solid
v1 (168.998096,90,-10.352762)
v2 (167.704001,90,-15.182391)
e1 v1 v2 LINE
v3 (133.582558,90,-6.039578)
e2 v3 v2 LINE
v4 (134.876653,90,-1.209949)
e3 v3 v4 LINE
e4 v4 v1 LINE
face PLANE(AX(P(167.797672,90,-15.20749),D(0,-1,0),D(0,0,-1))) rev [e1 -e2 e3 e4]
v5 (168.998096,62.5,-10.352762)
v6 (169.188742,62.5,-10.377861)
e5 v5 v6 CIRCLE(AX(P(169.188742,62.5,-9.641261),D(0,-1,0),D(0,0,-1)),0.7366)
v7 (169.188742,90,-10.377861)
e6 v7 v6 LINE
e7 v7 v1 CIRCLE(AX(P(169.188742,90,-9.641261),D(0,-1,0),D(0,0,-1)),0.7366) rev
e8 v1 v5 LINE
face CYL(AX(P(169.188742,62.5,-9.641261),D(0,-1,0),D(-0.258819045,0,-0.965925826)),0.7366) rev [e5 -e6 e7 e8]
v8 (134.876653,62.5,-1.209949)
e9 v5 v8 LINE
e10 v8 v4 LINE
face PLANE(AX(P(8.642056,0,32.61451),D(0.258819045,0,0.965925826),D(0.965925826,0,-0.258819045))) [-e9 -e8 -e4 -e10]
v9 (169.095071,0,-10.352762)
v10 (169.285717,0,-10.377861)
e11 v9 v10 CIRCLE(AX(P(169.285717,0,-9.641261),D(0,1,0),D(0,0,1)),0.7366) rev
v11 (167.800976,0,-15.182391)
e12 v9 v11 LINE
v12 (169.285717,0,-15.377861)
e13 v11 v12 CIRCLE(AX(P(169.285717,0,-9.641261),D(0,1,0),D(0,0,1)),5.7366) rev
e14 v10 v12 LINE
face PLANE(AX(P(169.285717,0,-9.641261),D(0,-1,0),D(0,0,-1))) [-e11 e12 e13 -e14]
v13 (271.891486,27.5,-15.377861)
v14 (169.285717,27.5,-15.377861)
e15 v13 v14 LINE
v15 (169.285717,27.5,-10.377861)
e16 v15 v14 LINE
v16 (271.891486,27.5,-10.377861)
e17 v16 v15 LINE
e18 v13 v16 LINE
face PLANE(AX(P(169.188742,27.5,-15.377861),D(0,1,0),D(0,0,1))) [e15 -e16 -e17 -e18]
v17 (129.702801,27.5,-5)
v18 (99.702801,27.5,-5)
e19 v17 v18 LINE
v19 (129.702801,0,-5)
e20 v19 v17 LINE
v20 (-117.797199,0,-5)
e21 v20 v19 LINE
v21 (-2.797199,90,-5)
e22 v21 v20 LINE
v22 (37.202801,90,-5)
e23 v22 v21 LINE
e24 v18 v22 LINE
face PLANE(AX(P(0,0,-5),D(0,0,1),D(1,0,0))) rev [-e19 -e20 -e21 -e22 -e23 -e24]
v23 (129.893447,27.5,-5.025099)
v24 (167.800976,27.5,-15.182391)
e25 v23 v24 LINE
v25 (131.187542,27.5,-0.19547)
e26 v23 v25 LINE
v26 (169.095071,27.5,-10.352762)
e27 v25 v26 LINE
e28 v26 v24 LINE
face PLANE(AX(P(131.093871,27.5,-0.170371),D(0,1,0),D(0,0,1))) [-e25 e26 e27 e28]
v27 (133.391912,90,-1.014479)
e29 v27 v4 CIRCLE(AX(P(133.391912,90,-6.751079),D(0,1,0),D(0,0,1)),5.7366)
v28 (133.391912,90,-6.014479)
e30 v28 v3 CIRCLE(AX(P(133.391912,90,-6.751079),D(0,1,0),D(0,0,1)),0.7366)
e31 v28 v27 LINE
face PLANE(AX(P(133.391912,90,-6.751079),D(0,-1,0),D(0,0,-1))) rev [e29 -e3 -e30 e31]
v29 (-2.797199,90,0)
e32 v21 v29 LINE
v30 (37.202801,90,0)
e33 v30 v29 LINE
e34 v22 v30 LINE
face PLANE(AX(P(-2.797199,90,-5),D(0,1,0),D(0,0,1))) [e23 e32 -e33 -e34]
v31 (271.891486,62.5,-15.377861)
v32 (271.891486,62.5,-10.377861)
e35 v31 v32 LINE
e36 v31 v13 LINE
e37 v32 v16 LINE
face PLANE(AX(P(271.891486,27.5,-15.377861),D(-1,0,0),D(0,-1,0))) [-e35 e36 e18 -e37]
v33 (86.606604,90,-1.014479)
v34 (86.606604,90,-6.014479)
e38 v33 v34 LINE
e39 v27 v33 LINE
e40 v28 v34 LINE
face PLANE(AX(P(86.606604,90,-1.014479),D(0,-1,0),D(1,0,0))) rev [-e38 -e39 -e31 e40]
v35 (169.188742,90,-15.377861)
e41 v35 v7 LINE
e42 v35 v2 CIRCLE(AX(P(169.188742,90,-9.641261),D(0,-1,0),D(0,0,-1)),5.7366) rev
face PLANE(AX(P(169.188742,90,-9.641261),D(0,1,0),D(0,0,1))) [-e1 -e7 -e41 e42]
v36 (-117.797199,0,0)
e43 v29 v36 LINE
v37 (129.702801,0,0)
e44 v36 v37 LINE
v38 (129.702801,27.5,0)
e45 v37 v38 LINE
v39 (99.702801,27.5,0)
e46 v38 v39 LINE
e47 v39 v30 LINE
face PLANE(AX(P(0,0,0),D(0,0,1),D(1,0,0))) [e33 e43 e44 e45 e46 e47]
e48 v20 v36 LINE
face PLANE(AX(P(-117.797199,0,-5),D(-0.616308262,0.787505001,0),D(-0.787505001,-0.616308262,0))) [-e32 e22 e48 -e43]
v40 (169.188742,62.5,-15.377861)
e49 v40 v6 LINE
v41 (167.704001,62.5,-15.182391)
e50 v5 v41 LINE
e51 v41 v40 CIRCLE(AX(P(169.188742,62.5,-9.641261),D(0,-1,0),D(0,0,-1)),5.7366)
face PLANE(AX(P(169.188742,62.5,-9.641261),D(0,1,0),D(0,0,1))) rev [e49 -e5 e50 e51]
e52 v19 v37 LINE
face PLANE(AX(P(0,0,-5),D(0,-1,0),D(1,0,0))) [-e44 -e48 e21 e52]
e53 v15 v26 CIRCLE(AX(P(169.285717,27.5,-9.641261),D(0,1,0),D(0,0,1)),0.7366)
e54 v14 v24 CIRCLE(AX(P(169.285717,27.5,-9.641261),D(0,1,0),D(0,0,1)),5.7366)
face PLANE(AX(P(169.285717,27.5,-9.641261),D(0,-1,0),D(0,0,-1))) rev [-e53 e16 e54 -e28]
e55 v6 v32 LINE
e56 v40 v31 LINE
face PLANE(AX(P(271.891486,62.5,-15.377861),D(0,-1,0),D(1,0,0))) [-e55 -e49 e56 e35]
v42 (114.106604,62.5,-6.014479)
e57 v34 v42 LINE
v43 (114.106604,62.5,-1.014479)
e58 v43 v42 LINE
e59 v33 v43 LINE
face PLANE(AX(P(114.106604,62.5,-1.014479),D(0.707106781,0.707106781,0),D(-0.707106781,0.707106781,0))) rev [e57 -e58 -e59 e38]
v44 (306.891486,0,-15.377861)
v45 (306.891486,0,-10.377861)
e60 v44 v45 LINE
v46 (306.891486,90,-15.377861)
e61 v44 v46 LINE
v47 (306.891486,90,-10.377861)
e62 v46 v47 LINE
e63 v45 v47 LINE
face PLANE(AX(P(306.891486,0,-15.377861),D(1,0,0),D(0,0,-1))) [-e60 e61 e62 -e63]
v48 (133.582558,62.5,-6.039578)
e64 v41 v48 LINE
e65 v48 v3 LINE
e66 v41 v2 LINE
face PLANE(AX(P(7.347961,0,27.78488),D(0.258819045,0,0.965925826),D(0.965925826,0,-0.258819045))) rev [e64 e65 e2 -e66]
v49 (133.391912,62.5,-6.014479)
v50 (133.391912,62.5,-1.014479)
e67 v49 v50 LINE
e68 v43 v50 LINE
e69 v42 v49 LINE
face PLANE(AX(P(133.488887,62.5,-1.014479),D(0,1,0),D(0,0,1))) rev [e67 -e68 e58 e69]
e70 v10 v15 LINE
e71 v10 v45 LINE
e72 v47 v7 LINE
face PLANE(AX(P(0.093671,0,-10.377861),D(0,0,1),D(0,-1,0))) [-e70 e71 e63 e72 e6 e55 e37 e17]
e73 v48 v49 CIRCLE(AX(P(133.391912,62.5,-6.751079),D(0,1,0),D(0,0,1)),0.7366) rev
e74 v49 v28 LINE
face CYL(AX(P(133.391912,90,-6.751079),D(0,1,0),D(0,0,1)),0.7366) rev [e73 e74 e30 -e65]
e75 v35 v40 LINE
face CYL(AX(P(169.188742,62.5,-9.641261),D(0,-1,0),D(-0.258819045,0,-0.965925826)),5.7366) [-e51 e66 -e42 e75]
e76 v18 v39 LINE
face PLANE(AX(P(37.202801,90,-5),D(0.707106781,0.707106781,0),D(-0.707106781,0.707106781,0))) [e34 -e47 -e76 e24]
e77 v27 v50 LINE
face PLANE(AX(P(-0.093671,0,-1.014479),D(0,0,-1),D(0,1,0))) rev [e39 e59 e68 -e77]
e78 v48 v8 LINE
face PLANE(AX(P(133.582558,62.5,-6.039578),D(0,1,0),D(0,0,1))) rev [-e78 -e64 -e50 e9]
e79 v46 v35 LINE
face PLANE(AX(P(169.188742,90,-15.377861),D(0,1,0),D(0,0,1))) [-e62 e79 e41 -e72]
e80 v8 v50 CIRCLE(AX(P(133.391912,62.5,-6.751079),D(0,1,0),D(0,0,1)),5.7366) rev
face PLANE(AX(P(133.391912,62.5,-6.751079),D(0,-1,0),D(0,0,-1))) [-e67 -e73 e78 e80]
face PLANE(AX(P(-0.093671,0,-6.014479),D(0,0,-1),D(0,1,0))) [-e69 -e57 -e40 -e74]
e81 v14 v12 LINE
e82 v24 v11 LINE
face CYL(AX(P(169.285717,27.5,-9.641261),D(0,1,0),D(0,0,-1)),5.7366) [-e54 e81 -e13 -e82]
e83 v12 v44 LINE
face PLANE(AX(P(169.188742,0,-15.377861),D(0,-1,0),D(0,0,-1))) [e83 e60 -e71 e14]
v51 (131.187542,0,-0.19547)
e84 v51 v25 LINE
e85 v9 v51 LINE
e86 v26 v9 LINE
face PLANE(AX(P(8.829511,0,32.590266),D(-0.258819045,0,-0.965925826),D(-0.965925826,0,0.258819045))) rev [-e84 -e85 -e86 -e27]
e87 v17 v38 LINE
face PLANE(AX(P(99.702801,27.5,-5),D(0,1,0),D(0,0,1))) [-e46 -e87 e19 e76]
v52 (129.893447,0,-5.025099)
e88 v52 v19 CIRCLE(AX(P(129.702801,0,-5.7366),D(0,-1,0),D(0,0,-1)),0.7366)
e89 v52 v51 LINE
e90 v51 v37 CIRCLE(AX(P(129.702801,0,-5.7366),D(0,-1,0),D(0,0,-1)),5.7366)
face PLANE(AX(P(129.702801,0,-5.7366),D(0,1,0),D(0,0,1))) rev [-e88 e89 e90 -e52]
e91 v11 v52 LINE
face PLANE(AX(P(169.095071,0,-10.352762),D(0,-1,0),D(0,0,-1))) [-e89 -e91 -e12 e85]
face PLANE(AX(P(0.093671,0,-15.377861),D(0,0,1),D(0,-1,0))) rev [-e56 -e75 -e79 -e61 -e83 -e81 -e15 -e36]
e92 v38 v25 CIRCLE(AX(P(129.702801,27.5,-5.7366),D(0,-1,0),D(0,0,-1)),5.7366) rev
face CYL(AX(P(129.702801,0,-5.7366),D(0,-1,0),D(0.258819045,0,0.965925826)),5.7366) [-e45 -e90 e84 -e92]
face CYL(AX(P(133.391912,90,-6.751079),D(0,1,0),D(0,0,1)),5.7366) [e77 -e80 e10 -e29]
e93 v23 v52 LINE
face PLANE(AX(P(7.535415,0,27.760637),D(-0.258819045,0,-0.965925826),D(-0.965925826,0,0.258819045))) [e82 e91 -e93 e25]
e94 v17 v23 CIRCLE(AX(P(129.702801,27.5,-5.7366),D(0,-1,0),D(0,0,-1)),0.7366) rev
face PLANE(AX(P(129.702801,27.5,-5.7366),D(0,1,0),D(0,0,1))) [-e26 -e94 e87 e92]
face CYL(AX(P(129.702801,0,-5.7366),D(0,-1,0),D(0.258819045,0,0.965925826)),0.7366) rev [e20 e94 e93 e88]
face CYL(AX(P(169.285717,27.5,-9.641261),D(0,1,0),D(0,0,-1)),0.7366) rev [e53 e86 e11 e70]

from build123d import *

# Parameters (mm, degrees)
BASE_FLANGE1_DEPTH       = 5
EDGE_FLANGE1_DEPTH       = 27.5
EDGE_FLANGE2_DEPTH       = 27.5
EDGE_FLANGE2_START       = 62.5
EDGE_FLANGE2_2_OUTLINE_W = 137.70274344
EDGE_FLANGE2_2_OUTLINE_H = 5
EDGE_FLANGE2_2_DEPTH     = 27.5
EDGE_FLANGE2_START_2     = 27.5
EDGE_FLANGE2_3_OUTLINE_W = 35
EDGE_FLANGE2_3_OUTLINE_H = 5
EDGE_FLANGE2_3_DEPTH     = 35
EDGE_FLANGE3_DEPTH       = 27.5
EDGE_FLANGE4_DEPTH       = 27.5
EDGE_FLANGE4_START       = 5
EDGE_FLANGE4_FLAT_DEPTH  = 5


# Read off the part's stored shape, not the designer's step: Edge-Flange2
# Sheet-metal steps are written as plain solids
with BuildPart() as part:
    # Sketch1 → Base-Flange1 (new body)
    with BuildSketch(Plane.XY):
        Polygon((0, 0), (-117.7971995, 0), (-2.7971995, 90), (37.2028005, 90), (99.7028005, 27.5), (129.7028005, 27.5), (129.7028005, 0), align=None)
    extrude(amount=-BASE_FLANGE1_DEPTH)

    # Edge-Flange1 section (across the edge) → Edge-Flange1 (add)
    with BuildSketch(Plane(origin=(129.79977573, 27.5, -5), x_dir=(-0.2588190451025146, 0, -0.96592582628907), z_dir=(0, -1, 0))):
        with BuildLine():
            Line((-5, 0.09697523), (-5, 39.341737512))
            Line((-5, 39.341737512), (0, 39.341737512))
            Line((0, 39.341737512), (0, 0.09697523))
            ThreePointArc((0, 0.09697523), (0.006301715, 0.000829637), (0.025099036, -0.093670879))
            Line((0.025099036, -0.093670879), (-4.804530095, -1.387766104))
            ThreePointArc((-4.804530095, -1.387766104), (-4.950922592, -0.651801325), (-5, 0.09697523))
        make_face()
    extrude(amount=EDGE_FLANGE1_DEPTH)

    # Edge-Flange2 outline → Edge-Flange2 (add)
    with BuildSketch(Plane(origin=(0, 0, 0), x_dir=(1, 0, 0), z_dir=(0, 1, 0))):
        with BuildLine():
            ThreePointArc((169.285717378, 15.37786084), (168.536940824, 15.328783432), (167.800976044, 15.182390936))
            Line((167.800976044, 15.182390936), (169.09507127, 10.352761804))
            ThreePointArc((169.09507127, 10.352761804), (169.189571785, 10.371559125), (169.285717378, 10.37786084))
            Line((169.285717378, 10.37786084), (306.891485589, 10.37786084))
            Line((306.891485589, 10.37786084), (306.891485589, 15.37786084))
            Line((306.891485589, 15.37786084), (169.285717378, 15.37786084))
        make_face()
    extrude(amount=EDGE_FLANGE2_DEPTH)



with BuildPart() as body_2:
    # Edge-Flange2 2 outline → Edge-Flange2 2 (new body)
    with BuildSketch(Plane(origin=(0, 0, 0), x_dir=(1, 0, 0), z_dir=(0, 1, 0)).offset(EDGE_FLANGE2_START)):
        with Locations((238.040113869, 12.87786084)):
            Rectangle(EDGE_FLANGE2_2_OUTLINE_W, EDGE_FLANGE2_2_OUTLINE_H)
    extrude(amount=EDGE_FLANGE2_2_DEPTH)


with BuildPart() as part_1:
    add(part.part)

    add(body_2.part)  # Edge-Flange2 3 merges body 2
    # Edge-Flange2 3 outline → Edge-Flange2 3 (add)
    with BuildSketch(Plane(origin=(0, 0, 0), x_dir=(1, 0, 0), z_dir=(0, 1, 0)).offset(EDGE_FLANGE2_START_2)):
        with Locations((289.391485589, 12.87786084)):
            Rectangle(EDGE_FLANGE2_3_OUTLINE_W, EDGE_FLANGE2_3_OUTLINE_H)
    extrude(amount=EDGE_FLANGE2_3_DEPTH)

    # Edge-Flange3 section (across the edge) → Edge-Flange3 (add)
    with BuildSketch(Plane(origin=(169.091766919, 90, -10.37786084), x_dir=(0.2588190451025146, 0, 0.96592582628907), z_dir=(0, -1, 0))):
        with BuildLine():
            Line((-5, 0.09697523), (-5, 35.422092475))
            Line((-5, 35.422092475), (0, 35.422092475))
            Line((0, 35.422092475), (0, 0.09697523))
            ThreePointArc((0, 0.09697523), (0.006301715, 0.000829637), (0.025099036, -0.093670879))
            Line((0.025099036, -0.093670879), (-4.804530095, -1.387766104))
            ThreePointArc((-4.804530095, -1.387766104), (-4.950922592, -0.651801325), (-5, 0.09697523))
        make_face()
    extrude(amount=EDGE_FLANGE3_DEPTH)

    # Edge-Flange4 bend section (across the edge) → Edge-Flange4 (add)
    with BuildSketch(Plane(origin=(133.488886871, 62.5, -6.014478786), x_dir=(0, 0, -1), z_dir=(0, 1, 0))):
        with BuildLine():
            Line((-5, 0.09697523), (0, 0.09697523))
            ThreePointArc((0, 0.09697523), (0.006301715, 0.000829637), (0.025099036, -0.093670879))
            Line((0.025099036, -0.093670879), (-4.804530095, -1.387766104))
            ThreePointArc((-4.804530095, -1.387766104), (-4.950922592, -0.651801325), (-5, 0.09697523))
        make_face()
    extrude(amount=EDGE_FLANGE4_DEPTH)

    # Edge-Flange4 profile (on flange) → Edge-Flange4 flat (add)
    with BuildSketch(Plane(origin=(133.488886871, 0, -6.014478786), x_dir=(0, 1, 0), z_dir=(0, 0, 1)).offset(EDGE_FLANGE4_START)):
        Polygon((62.5, 19.382282567), (62.5, 0.09697523), (90, 0.09697523), (90, 46.882282567), align=None)
    extrude(amount=-EDGE_FLANGE4_FLAT_DEPTH)


solid = part_1.part
